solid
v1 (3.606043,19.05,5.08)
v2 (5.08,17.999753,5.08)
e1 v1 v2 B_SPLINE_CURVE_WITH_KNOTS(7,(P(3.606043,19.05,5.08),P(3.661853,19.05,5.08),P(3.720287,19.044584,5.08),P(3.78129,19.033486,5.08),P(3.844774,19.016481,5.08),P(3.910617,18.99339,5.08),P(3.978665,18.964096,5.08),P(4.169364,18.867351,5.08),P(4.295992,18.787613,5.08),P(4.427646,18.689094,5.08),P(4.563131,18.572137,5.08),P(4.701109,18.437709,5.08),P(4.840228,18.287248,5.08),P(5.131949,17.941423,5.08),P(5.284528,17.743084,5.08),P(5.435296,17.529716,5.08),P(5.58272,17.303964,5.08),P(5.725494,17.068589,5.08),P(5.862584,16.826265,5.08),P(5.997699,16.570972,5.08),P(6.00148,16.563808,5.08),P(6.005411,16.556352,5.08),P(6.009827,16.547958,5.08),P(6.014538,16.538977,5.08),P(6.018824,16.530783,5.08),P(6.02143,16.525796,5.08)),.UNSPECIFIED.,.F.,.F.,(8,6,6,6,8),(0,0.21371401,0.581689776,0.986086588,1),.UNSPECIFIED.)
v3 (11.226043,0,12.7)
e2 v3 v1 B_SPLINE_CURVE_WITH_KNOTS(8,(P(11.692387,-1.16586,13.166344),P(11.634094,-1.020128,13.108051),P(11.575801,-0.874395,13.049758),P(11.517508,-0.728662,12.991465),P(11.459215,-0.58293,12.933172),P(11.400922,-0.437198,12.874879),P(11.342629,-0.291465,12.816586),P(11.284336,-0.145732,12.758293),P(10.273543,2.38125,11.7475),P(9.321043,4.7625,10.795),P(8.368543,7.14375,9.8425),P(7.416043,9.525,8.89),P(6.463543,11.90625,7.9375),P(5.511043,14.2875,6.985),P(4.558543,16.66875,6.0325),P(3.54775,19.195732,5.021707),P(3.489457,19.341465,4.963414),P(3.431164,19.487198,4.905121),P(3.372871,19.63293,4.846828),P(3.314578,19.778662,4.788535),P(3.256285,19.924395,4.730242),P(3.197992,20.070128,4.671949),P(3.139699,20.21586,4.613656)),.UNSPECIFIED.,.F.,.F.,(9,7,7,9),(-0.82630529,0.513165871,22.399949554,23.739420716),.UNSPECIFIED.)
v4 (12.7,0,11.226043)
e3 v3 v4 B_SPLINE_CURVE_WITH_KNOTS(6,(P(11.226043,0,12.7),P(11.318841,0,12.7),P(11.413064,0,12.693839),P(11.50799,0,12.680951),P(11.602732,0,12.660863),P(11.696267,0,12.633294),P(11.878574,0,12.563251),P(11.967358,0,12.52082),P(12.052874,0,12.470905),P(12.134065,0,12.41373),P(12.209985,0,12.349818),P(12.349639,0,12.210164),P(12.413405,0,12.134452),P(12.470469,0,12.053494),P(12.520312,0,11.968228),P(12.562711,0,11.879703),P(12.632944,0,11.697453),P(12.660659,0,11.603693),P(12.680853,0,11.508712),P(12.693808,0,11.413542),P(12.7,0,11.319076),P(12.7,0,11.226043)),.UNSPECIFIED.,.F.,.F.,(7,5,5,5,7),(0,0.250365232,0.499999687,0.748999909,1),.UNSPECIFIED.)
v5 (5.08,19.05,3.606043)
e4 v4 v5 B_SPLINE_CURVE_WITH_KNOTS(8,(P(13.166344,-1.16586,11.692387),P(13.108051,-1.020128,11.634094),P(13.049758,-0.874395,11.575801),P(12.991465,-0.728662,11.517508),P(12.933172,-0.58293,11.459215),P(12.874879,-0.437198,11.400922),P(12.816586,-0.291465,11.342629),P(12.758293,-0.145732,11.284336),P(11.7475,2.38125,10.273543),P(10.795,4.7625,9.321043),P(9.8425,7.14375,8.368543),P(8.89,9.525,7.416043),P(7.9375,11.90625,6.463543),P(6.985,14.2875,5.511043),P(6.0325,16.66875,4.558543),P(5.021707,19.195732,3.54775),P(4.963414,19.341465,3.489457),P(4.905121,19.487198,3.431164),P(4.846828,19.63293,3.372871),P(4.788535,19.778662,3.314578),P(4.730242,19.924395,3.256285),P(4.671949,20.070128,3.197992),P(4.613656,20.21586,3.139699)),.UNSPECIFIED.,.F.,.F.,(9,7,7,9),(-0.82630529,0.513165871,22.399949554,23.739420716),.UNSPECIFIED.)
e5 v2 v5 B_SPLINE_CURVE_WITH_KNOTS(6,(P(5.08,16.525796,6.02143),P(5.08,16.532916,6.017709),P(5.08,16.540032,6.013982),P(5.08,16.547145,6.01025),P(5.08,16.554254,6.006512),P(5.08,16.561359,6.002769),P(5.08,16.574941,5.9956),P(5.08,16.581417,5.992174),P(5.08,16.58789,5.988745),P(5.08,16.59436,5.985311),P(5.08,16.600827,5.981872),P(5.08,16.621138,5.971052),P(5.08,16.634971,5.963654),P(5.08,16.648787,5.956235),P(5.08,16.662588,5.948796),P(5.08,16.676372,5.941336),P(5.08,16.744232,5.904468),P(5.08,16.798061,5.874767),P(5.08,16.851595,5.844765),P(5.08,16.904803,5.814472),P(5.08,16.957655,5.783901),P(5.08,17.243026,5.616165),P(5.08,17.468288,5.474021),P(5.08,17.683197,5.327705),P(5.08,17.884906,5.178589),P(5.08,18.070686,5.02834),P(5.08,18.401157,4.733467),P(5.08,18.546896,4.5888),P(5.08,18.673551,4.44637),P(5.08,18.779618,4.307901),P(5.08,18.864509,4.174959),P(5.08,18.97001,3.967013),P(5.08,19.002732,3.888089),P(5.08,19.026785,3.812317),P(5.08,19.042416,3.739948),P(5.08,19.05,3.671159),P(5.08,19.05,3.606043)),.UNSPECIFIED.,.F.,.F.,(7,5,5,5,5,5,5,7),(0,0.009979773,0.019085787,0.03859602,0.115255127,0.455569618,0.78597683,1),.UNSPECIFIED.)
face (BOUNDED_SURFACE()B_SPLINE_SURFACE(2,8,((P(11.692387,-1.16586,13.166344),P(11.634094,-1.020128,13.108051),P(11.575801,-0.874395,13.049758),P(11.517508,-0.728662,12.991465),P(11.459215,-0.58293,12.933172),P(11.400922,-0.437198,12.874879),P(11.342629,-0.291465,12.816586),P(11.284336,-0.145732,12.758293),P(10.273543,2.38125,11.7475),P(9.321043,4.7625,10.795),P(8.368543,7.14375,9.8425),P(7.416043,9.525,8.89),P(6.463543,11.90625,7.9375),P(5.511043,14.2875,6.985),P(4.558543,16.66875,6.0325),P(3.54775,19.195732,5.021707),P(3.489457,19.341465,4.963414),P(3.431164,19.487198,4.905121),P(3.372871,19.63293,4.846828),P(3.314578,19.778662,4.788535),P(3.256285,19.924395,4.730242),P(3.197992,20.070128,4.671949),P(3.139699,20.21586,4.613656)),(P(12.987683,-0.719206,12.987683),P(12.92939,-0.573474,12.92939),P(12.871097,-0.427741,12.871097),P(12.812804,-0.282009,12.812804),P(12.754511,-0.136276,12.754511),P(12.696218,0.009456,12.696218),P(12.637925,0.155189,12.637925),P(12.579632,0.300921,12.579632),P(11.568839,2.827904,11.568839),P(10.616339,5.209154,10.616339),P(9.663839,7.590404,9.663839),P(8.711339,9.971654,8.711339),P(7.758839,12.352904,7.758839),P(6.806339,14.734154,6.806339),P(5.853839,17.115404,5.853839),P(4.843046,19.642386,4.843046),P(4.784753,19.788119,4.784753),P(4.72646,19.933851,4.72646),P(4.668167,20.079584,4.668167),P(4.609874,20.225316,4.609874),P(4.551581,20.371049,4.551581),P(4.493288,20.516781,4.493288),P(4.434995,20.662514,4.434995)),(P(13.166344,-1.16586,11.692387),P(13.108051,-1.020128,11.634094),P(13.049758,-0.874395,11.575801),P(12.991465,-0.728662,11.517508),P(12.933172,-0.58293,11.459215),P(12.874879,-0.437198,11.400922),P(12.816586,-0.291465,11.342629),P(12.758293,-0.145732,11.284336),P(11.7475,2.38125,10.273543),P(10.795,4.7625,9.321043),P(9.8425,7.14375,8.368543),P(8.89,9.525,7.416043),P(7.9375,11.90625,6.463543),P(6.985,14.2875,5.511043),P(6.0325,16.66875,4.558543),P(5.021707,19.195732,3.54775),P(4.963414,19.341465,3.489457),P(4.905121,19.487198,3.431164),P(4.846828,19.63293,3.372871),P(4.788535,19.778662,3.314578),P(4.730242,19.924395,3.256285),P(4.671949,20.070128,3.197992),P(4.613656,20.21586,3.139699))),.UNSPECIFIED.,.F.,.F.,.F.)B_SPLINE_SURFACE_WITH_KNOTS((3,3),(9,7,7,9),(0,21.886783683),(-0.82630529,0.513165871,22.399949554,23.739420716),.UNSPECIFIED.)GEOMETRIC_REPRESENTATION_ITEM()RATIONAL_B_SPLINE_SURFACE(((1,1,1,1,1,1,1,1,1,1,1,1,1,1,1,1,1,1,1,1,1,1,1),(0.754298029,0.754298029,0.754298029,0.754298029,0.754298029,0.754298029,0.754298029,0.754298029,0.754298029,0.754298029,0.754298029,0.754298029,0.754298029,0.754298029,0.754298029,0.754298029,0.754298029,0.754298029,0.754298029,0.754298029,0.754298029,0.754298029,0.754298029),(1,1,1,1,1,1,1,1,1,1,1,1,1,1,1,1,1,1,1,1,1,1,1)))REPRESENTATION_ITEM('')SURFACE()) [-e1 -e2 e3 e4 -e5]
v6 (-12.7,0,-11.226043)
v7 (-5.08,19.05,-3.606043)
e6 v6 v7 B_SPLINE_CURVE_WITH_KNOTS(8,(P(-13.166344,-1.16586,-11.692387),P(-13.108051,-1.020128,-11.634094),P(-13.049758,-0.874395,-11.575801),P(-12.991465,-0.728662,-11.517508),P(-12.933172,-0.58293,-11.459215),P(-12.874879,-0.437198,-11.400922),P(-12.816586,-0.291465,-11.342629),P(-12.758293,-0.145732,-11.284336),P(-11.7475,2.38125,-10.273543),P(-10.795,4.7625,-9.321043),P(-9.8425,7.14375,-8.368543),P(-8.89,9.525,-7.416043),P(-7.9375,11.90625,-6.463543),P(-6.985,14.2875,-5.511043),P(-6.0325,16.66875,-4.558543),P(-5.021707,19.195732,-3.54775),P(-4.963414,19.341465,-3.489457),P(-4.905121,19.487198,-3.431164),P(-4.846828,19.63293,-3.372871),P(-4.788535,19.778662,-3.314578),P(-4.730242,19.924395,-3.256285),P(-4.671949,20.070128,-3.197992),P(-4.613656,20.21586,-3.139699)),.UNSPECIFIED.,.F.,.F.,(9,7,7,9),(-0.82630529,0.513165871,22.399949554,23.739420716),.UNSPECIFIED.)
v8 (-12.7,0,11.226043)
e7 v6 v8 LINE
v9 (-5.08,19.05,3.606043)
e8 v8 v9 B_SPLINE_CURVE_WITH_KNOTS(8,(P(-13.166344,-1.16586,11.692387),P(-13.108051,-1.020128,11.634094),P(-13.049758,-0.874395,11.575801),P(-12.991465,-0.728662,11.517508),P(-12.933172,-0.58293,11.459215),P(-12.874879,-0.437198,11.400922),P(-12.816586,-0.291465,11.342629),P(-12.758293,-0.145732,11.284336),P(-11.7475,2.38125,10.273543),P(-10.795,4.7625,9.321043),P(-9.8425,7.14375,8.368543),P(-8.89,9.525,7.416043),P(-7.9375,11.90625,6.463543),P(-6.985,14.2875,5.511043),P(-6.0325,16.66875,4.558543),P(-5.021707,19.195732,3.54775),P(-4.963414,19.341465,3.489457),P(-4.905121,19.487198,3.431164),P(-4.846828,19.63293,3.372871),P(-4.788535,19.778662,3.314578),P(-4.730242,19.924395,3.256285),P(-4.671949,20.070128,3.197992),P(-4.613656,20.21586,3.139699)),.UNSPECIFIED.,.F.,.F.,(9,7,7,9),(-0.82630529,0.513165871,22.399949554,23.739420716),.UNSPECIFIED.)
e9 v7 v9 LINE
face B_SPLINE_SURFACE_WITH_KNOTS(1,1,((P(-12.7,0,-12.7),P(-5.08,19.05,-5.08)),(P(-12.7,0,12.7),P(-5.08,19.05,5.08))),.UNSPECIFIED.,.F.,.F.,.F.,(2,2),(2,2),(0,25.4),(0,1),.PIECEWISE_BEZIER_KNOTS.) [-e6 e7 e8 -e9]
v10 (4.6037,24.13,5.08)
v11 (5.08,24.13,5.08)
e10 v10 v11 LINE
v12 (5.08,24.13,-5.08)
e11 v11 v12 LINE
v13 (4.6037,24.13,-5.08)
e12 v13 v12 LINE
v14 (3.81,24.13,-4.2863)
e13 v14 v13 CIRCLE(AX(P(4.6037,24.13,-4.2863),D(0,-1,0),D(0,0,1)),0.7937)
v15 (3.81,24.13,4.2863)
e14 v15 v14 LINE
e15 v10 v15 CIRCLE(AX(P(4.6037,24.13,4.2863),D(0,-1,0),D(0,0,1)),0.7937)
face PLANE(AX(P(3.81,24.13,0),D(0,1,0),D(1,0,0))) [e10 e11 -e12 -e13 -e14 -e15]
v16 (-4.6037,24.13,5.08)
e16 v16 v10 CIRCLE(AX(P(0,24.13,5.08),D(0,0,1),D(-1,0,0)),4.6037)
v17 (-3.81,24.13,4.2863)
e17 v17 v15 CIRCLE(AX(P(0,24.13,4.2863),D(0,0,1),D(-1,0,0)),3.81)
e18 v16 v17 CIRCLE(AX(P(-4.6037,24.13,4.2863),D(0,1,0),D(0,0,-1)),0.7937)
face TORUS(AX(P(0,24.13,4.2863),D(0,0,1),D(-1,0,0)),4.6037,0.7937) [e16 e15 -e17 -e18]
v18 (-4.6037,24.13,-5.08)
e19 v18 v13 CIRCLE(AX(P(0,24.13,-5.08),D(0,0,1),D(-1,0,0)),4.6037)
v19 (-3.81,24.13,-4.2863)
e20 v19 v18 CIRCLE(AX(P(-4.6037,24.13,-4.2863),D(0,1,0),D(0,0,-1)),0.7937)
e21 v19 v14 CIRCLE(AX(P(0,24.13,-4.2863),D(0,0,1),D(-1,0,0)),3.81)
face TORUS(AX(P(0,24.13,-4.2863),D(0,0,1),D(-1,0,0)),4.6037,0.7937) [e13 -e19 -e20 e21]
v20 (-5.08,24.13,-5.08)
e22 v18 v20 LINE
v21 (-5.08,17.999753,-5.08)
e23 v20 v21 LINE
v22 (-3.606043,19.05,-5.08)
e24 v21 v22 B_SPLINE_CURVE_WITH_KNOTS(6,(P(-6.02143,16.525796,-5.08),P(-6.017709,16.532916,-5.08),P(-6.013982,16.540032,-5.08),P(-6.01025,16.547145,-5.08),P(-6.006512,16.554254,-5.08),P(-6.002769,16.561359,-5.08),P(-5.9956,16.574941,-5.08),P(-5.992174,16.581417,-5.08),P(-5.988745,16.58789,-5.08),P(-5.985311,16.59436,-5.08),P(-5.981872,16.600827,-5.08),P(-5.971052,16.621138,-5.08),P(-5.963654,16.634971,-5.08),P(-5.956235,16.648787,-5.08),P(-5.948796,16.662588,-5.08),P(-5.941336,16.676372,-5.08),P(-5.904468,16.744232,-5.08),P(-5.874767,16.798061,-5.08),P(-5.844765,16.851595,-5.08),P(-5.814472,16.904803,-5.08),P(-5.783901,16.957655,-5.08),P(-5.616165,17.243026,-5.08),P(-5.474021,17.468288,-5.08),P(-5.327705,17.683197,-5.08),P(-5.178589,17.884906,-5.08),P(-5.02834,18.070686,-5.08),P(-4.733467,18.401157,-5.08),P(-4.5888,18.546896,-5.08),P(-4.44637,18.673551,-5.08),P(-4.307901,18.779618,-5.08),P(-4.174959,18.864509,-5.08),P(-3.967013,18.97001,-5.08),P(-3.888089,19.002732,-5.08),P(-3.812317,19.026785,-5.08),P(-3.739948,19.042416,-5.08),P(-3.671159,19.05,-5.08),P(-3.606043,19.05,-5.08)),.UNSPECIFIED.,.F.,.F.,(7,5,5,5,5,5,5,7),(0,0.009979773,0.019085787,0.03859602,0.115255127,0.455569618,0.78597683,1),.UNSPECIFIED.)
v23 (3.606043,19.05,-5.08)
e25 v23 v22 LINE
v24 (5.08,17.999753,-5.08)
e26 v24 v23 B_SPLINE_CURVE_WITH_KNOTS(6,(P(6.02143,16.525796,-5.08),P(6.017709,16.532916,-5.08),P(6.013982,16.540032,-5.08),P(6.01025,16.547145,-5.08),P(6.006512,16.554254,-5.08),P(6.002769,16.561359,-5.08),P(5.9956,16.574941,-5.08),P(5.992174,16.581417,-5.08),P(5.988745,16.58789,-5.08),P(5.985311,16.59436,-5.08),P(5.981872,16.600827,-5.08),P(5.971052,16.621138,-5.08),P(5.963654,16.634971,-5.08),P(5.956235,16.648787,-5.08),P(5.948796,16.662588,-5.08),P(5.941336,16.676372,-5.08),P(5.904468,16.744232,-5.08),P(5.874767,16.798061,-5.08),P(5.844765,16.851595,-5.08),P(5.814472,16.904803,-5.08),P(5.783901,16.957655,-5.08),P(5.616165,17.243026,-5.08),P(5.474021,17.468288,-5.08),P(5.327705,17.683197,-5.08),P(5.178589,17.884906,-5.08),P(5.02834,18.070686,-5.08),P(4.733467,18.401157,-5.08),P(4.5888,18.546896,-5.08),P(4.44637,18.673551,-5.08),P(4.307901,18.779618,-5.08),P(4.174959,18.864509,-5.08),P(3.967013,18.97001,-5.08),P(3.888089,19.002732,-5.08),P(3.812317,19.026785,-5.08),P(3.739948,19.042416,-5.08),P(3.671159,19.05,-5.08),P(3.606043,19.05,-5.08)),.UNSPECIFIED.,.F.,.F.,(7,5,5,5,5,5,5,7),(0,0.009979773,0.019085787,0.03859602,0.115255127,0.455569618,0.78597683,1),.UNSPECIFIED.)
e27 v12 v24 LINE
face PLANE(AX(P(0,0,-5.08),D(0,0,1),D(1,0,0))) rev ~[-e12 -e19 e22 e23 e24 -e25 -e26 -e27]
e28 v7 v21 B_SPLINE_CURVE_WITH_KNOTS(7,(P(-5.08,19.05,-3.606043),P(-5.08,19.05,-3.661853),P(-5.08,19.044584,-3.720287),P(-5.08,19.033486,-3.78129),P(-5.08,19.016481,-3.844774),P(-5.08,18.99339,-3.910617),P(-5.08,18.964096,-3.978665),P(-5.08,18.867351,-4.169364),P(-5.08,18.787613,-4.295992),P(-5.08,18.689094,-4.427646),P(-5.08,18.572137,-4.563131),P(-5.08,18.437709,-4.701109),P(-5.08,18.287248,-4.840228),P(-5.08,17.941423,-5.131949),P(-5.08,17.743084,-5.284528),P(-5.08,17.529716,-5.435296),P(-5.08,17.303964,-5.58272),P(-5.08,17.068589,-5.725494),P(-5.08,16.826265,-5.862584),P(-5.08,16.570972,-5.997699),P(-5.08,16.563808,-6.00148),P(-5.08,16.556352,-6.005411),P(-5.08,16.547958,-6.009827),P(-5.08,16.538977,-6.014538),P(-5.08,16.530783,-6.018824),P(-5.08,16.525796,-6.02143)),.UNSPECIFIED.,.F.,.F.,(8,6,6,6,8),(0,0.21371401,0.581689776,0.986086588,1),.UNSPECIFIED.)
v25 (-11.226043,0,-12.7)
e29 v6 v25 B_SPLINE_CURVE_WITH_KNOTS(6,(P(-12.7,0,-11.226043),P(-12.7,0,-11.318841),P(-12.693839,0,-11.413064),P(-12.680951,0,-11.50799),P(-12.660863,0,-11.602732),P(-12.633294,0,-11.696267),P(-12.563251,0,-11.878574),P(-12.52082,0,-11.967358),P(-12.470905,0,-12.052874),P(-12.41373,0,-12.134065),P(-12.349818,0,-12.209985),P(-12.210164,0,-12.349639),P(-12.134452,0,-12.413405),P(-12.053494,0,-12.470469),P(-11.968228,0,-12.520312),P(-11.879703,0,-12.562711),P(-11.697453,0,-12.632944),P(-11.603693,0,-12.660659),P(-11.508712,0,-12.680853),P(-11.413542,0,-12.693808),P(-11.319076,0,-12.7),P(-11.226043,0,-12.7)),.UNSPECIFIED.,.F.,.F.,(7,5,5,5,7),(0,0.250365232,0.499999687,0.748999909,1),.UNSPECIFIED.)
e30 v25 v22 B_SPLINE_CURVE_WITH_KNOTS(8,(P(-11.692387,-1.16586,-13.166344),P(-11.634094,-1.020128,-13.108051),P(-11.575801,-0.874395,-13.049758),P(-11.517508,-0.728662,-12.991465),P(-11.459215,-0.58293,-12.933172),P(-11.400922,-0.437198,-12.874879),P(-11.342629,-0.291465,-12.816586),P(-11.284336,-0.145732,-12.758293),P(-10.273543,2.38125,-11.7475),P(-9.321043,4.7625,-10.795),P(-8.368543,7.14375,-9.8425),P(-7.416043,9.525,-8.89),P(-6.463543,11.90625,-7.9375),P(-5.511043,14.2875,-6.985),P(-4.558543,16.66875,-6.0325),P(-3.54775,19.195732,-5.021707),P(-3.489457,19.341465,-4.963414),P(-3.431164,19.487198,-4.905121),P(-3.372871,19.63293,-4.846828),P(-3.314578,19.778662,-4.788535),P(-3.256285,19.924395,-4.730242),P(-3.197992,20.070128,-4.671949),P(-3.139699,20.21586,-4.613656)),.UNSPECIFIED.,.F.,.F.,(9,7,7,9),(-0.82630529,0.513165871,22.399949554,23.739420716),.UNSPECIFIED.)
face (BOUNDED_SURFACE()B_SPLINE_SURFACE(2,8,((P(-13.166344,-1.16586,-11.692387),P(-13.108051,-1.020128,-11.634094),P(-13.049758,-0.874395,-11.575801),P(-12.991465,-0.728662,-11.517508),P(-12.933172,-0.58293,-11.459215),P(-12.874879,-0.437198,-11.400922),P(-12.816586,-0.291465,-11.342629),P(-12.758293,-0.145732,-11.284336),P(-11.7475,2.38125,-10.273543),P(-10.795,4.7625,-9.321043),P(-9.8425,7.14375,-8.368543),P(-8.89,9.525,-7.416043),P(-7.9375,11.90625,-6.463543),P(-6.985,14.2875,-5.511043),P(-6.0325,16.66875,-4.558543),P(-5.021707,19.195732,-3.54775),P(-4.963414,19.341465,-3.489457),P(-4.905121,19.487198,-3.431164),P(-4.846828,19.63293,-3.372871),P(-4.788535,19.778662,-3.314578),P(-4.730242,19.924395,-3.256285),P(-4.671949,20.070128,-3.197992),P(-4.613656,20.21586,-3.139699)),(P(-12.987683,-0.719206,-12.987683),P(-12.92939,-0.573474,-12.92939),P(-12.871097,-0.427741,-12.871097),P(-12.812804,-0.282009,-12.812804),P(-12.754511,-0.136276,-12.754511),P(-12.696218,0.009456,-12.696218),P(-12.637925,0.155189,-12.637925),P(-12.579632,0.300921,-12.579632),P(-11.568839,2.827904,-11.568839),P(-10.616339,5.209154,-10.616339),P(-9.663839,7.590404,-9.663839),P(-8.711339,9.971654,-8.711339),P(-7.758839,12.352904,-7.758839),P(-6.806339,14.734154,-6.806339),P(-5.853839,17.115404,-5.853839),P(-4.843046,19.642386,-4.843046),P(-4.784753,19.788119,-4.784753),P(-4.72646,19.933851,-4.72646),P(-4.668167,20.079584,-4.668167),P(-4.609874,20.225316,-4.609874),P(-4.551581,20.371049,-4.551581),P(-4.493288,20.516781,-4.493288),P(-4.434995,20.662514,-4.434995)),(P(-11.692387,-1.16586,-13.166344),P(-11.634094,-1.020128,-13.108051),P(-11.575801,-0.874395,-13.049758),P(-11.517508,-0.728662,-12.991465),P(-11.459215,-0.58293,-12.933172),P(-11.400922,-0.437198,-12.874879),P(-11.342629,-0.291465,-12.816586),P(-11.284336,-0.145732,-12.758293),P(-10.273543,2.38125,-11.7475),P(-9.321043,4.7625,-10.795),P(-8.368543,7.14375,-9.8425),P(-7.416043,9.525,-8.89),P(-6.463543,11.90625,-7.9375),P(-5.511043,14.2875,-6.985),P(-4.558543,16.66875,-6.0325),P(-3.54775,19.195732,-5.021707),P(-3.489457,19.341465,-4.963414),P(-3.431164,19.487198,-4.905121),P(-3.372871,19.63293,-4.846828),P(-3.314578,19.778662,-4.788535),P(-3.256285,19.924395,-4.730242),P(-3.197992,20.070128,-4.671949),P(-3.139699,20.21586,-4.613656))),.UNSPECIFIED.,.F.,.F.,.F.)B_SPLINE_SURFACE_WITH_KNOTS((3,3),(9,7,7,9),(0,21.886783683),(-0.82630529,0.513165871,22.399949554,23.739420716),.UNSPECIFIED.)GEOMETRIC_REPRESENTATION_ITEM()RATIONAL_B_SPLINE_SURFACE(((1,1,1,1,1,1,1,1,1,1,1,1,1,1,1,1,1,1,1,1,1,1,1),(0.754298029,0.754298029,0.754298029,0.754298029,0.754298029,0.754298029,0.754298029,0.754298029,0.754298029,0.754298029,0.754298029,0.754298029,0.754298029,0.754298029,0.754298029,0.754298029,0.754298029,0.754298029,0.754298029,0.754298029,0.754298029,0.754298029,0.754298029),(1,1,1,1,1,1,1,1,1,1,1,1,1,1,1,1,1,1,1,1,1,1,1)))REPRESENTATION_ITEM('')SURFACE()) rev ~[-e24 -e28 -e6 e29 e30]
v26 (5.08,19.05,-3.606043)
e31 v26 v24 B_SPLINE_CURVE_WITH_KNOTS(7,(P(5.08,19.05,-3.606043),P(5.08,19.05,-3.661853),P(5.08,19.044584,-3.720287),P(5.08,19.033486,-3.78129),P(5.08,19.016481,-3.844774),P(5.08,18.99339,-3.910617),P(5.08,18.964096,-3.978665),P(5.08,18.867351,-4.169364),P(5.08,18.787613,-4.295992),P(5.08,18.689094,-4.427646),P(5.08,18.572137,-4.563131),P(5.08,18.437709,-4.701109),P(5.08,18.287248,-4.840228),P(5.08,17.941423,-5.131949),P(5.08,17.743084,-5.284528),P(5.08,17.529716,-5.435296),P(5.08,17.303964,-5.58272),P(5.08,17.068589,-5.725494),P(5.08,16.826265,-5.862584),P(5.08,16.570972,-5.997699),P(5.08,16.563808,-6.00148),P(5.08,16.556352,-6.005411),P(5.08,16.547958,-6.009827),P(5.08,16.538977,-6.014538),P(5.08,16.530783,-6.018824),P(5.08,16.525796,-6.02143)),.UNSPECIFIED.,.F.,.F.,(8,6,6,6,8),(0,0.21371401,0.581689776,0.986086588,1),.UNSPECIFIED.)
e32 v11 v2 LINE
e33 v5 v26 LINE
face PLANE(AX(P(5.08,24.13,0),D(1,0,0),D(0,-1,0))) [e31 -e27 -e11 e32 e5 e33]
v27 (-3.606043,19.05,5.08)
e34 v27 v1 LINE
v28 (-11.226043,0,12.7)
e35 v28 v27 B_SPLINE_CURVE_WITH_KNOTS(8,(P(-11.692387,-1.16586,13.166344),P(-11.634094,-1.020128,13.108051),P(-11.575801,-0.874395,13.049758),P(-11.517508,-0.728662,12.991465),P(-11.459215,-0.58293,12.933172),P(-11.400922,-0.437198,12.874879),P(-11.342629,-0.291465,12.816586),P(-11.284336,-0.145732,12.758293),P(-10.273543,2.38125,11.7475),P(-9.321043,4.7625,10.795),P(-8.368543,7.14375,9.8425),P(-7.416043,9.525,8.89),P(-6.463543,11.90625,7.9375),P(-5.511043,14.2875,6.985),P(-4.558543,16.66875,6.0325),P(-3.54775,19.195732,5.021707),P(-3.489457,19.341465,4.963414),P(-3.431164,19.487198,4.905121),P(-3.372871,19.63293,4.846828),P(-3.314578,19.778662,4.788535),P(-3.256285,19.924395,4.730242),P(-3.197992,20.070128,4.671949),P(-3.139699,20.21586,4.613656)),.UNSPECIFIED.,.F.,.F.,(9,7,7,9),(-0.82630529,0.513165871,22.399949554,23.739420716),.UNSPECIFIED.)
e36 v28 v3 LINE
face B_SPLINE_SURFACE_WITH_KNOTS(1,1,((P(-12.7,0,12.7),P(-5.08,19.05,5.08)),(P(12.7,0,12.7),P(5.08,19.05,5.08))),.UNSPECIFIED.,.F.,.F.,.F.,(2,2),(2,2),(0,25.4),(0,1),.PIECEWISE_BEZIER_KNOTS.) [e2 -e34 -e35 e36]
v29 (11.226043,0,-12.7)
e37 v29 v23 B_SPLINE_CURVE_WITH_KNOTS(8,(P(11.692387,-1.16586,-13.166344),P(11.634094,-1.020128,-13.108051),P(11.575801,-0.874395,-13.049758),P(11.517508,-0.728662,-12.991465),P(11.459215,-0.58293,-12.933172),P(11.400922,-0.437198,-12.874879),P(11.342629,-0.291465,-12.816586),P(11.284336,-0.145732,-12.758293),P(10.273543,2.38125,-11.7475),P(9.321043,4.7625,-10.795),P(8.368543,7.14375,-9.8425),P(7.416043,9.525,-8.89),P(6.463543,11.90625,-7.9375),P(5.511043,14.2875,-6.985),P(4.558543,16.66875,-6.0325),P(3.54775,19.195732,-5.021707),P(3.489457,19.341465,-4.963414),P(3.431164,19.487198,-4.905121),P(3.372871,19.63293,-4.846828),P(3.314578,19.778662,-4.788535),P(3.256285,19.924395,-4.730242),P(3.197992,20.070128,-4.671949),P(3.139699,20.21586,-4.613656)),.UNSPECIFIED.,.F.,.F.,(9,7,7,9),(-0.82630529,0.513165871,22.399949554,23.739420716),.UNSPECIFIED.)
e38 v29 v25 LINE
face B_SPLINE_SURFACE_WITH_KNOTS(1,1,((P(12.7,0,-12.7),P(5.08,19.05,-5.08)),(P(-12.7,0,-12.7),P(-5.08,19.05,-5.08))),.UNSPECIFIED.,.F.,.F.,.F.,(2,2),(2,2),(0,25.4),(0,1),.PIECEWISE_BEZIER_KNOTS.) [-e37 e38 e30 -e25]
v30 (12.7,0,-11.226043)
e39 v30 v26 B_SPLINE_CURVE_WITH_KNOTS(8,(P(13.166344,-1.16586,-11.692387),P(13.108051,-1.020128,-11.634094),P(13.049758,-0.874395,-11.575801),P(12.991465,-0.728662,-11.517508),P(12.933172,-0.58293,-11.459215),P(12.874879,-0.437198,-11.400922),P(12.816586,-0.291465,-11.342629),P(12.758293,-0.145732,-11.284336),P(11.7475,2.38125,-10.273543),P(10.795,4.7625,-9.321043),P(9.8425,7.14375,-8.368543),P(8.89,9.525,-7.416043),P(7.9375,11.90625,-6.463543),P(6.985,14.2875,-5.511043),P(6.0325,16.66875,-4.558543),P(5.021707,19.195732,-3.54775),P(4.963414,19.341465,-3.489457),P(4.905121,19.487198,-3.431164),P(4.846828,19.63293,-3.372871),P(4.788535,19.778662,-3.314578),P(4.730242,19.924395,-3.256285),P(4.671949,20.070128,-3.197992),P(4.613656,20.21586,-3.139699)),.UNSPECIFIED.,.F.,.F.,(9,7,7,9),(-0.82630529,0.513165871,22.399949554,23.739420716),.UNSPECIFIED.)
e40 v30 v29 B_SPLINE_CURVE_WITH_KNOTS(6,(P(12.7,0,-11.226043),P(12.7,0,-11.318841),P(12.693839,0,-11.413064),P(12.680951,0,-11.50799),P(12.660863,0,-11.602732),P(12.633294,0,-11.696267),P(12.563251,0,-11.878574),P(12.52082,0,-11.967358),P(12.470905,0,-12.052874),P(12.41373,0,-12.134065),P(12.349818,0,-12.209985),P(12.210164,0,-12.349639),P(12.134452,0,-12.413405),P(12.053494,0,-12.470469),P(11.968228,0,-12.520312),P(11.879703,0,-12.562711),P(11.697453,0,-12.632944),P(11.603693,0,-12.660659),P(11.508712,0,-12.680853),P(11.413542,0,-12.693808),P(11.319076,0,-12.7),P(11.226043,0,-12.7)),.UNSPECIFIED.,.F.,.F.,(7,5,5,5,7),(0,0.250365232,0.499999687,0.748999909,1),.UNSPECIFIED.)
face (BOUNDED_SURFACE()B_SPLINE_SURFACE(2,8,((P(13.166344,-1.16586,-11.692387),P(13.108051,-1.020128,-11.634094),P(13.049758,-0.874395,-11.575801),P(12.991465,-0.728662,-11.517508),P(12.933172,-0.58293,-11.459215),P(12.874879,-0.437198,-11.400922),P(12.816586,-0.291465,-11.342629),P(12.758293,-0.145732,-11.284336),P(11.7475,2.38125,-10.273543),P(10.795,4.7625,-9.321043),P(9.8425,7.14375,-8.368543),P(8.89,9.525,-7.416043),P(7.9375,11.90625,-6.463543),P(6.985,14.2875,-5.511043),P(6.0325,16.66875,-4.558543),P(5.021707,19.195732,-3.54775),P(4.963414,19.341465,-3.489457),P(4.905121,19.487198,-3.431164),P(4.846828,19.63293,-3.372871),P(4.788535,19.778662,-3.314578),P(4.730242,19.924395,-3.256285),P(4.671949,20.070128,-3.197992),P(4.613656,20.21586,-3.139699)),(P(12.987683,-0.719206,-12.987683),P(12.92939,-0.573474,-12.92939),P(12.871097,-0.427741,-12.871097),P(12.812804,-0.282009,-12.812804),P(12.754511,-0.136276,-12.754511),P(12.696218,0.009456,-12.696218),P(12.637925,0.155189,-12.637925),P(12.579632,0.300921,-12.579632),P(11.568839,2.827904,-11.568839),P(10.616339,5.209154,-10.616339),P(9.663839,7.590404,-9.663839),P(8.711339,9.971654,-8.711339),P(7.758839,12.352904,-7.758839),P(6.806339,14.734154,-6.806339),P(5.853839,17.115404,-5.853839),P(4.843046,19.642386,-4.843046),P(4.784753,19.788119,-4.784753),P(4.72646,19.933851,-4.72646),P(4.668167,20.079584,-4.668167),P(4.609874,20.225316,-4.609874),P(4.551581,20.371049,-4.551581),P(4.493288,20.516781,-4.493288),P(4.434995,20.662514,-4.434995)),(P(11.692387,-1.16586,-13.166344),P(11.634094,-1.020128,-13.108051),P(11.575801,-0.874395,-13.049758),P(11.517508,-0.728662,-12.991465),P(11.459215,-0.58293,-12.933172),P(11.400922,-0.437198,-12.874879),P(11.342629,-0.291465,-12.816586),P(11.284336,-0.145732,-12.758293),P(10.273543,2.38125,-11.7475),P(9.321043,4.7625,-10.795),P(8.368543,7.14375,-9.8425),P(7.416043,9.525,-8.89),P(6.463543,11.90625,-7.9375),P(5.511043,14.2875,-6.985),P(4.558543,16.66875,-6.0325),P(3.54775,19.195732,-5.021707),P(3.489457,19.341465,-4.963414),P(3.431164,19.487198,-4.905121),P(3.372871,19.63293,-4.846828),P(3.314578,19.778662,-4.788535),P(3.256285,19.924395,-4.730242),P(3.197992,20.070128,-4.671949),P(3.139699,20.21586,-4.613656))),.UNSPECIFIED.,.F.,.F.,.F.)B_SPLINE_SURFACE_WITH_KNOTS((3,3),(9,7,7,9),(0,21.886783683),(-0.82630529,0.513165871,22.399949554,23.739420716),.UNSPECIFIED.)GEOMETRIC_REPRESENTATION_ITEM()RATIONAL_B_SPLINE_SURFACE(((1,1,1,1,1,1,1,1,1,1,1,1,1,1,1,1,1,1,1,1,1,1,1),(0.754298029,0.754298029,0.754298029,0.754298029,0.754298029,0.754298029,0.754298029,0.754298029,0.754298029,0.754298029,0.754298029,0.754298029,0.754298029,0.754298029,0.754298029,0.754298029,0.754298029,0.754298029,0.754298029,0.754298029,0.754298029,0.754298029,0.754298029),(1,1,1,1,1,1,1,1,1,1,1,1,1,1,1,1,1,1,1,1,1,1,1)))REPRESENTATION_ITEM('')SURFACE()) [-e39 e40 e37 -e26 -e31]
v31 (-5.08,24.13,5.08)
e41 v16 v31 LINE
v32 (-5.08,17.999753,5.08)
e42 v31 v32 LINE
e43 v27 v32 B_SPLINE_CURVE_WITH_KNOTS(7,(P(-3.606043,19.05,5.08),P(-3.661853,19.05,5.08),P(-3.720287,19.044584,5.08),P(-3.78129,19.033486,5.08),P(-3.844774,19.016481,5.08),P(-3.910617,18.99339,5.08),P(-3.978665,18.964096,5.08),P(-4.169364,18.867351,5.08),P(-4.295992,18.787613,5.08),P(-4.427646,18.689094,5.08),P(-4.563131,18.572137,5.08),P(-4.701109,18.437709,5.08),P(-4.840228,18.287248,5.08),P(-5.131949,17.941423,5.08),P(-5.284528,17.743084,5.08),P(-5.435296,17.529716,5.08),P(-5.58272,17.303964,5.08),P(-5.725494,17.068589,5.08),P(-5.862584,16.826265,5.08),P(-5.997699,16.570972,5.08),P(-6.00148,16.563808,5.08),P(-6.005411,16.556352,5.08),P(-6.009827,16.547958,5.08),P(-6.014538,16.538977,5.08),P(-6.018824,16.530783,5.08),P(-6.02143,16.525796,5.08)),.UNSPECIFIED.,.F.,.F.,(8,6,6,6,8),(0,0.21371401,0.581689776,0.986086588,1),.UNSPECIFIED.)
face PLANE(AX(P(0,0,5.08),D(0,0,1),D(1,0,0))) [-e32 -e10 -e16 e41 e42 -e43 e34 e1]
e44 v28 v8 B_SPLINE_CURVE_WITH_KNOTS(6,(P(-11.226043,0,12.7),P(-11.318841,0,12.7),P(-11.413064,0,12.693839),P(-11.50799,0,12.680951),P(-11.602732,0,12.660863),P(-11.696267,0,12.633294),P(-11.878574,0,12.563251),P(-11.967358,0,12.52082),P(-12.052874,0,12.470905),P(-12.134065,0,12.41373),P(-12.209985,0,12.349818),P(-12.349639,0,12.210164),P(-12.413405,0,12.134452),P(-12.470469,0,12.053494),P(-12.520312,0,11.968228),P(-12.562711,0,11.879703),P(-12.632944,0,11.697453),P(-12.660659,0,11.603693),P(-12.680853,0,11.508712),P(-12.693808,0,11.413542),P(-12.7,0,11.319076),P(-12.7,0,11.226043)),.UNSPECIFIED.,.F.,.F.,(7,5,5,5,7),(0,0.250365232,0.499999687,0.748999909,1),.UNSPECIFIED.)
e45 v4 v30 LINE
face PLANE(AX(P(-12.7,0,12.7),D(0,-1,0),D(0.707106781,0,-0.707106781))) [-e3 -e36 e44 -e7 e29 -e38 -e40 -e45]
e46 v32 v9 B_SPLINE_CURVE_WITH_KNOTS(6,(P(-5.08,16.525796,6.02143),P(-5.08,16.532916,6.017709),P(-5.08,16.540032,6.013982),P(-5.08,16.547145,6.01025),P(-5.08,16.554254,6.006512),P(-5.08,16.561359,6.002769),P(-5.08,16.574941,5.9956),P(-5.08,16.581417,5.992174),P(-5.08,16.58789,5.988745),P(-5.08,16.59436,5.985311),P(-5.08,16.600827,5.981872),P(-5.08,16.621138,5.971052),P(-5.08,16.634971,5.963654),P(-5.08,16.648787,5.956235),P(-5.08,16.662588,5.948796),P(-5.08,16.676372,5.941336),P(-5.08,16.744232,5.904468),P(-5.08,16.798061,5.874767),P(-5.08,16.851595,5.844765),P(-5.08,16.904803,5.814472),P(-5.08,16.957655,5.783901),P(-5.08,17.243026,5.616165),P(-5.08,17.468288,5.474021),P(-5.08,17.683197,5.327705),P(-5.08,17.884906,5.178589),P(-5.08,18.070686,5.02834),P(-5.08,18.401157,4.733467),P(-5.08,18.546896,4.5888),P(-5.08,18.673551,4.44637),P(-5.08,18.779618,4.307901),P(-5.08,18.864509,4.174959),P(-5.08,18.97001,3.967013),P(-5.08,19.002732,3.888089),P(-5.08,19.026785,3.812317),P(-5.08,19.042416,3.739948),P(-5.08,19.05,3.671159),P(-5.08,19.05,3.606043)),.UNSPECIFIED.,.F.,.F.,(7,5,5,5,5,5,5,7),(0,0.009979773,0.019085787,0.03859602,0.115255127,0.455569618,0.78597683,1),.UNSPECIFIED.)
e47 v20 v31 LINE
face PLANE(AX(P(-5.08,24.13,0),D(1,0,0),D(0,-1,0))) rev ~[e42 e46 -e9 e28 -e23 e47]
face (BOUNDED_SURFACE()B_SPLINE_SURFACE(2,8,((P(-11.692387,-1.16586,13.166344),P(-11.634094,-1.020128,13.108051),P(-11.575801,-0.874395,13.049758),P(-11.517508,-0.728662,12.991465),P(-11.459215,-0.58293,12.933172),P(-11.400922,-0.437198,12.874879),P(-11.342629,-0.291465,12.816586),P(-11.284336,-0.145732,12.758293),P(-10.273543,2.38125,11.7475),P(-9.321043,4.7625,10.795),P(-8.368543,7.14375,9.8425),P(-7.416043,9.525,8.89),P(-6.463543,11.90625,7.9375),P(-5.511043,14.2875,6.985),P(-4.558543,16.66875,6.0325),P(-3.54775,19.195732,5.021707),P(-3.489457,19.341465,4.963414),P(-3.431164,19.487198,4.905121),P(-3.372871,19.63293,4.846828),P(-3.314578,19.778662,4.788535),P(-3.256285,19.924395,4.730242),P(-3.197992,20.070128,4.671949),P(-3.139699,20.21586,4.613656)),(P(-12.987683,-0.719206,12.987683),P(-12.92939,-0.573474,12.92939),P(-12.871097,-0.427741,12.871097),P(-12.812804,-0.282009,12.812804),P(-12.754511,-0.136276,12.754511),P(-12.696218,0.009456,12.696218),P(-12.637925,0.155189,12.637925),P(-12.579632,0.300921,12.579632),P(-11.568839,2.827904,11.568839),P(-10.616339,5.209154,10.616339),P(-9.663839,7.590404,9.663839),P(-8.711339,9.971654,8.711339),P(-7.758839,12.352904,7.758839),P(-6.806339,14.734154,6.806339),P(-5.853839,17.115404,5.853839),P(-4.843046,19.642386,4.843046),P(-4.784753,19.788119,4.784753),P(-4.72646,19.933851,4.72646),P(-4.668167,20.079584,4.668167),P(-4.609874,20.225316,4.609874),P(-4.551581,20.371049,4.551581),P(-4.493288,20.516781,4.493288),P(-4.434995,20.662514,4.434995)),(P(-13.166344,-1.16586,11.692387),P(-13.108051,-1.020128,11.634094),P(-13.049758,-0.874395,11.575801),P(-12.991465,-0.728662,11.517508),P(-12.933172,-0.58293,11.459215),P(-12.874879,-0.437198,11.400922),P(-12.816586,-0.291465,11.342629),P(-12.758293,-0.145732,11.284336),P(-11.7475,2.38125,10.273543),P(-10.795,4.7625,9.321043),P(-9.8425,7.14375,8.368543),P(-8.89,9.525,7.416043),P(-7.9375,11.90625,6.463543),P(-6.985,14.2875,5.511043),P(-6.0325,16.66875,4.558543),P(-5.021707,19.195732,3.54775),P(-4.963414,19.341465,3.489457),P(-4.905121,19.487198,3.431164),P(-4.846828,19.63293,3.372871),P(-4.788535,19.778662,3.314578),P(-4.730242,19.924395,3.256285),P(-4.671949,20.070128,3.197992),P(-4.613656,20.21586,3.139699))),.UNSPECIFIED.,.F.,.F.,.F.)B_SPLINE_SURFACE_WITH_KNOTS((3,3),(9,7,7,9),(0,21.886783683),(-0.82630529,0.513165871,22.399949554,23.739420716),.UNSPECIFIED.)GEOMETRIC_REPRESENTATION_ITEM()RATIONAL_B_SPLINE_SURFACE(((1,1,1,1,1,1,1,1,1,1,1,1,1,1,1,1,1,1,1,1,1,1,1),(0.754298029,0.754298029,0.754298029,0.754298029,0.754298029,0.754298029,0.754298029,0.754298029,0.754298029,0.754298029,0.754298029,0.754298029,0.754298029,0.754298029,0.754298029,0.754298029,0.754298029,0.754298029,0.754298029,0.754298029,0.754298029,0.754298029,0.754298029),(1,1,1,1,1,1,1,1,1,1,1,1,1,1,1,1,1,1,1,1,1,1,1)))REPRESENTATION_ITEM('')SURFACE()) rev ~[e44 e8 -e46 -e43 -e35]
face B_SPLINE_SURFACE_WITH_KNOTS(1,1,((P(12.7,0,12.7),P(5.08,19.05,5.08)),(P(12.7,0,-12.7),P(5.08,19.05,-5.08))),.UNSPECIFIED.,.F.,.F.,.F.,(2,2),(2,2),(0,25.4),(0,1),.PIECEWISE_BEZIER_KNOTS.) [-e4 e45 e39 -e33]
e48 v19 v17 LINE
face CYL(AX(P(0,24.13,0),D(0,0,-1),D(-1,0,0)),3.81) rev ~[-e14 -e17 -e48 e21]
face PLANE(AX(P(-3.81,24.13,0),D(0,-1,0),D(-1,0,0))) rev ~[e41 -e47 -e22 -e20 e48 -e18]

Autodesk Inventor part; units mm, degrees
ref_plane "YZ Plane" through (0, 0, 0) normal (1, 0, 0) x (0, 1, 0)
ref_plane "XY Plane" through (0, 0, 0) normal (0, 0, 1) x (1, 0, 0)
sketch "Sketch1" plane through (0, 0, 0) normal (0, 1, 0) x (-1, 0, 0)
  line L0 (-12.7, 12.7) -> (-12.7, -12.7)
  line L1 (-12.7, -12.7) -> (12.7, -12.7)
  line L2 (12.7, -12.7) -> (12.7, 12.7)
  line L3 (12.7, 12.7) -> (-12.7, 12.7)
  line L4 (-12.7, 12.7) -> (12.7, -12.7) construction
  line L5 (-12.7, -12.7) -> (12.7, 12.7) construction
  point P0 (0, 0)
  dimension "base" = 25.4
ref_plane "Work Plane1" through (0, 19.05, 0) normal (0, 1, 0) x (-1, 0, 0)
sketch "Sketch2" plane through (0, 19.05, 0) normal (0, 1, 0) x (-1, 0, 0)
  line L0 (-5.08, 5.08) -> (-5.08, -5.08)
  line L1 (-5.08, -5.08) -> (5.08, -5.08)
  line L2 (5.08, -5.08) -> (5.08, 5.08)
  line L3 (5.08, 5.08) -> (-5.08, 5.08)
  line L4 (-5.08, 5.08) -> (5.08, -5.08) construction
  line L5 (-5.08, -5.08) -> (5.08, 5.08) construction
  point P0 (0, 0)
  dimension "topOfPyramid" = 10.16
loft "Loft1" add profiles "Sketch1", "Sketch2"
sketch "Sketch3" plane through (0, 0, 0) normal (0, 0, 1) x (1, 0, 0)
  arc A0 (-3.81, 24.13) -> (3.81, 24.13) centre (0, 24.13) ccw
  arc A1 (-5.08, 24.13) -> (5.08, 24.13) centre (0, 24.13) ccw
  line L0 (5.08, 19.05) -> (-5.08, 19.05) projected
  line L1 (3.81, 24.13) -> (5.08, 24.13)
  line L2 (-3.81, 24.13) -> (-5.08, 24.13)
  line L3 (-5.08, 24.13) -> (-5.08, 19.05)
  line L4 (5.08, 24.13) -> (5.08, 19.05)
  line L5 (12.7, 0) -> (5.08, 19.05) projected
  line L6 (5.08, 19.05) -> (0, 19.05)
  line L7 (-5.08, 19.05) -> (5.08, 19.05) projected
  line L8 (-5.08, 19.05) -> (0, 19.05)
  point P0 (0, 0)
  dimension "innerDiamForRope" = 7.62
  dimension "centerForRope" = 5.08
  dimension "outsideDiam" = 10.16
extrude "Extrusion1" add sketch "Sketch3" along normal mid plane 10.16
fillet "Fillet3" radius 1.5875 4 edges at (8.89, 9.525, 8.89) (8.89, 9.525, -8.89) (-8.89, 9.525, 8.89) (-8.89, 9.525, -8.89)
fillet "Fillet5" radius 0.7937 2 edges at (0, 20.32, 5.08) (0, 20.32, -5.08)
equation "\"centerForRope\" = 0.5 * outsideDiam"
equation "\"widthOfTop\" = topOfPyramid"
properties part number "SupportForMouseWire"
